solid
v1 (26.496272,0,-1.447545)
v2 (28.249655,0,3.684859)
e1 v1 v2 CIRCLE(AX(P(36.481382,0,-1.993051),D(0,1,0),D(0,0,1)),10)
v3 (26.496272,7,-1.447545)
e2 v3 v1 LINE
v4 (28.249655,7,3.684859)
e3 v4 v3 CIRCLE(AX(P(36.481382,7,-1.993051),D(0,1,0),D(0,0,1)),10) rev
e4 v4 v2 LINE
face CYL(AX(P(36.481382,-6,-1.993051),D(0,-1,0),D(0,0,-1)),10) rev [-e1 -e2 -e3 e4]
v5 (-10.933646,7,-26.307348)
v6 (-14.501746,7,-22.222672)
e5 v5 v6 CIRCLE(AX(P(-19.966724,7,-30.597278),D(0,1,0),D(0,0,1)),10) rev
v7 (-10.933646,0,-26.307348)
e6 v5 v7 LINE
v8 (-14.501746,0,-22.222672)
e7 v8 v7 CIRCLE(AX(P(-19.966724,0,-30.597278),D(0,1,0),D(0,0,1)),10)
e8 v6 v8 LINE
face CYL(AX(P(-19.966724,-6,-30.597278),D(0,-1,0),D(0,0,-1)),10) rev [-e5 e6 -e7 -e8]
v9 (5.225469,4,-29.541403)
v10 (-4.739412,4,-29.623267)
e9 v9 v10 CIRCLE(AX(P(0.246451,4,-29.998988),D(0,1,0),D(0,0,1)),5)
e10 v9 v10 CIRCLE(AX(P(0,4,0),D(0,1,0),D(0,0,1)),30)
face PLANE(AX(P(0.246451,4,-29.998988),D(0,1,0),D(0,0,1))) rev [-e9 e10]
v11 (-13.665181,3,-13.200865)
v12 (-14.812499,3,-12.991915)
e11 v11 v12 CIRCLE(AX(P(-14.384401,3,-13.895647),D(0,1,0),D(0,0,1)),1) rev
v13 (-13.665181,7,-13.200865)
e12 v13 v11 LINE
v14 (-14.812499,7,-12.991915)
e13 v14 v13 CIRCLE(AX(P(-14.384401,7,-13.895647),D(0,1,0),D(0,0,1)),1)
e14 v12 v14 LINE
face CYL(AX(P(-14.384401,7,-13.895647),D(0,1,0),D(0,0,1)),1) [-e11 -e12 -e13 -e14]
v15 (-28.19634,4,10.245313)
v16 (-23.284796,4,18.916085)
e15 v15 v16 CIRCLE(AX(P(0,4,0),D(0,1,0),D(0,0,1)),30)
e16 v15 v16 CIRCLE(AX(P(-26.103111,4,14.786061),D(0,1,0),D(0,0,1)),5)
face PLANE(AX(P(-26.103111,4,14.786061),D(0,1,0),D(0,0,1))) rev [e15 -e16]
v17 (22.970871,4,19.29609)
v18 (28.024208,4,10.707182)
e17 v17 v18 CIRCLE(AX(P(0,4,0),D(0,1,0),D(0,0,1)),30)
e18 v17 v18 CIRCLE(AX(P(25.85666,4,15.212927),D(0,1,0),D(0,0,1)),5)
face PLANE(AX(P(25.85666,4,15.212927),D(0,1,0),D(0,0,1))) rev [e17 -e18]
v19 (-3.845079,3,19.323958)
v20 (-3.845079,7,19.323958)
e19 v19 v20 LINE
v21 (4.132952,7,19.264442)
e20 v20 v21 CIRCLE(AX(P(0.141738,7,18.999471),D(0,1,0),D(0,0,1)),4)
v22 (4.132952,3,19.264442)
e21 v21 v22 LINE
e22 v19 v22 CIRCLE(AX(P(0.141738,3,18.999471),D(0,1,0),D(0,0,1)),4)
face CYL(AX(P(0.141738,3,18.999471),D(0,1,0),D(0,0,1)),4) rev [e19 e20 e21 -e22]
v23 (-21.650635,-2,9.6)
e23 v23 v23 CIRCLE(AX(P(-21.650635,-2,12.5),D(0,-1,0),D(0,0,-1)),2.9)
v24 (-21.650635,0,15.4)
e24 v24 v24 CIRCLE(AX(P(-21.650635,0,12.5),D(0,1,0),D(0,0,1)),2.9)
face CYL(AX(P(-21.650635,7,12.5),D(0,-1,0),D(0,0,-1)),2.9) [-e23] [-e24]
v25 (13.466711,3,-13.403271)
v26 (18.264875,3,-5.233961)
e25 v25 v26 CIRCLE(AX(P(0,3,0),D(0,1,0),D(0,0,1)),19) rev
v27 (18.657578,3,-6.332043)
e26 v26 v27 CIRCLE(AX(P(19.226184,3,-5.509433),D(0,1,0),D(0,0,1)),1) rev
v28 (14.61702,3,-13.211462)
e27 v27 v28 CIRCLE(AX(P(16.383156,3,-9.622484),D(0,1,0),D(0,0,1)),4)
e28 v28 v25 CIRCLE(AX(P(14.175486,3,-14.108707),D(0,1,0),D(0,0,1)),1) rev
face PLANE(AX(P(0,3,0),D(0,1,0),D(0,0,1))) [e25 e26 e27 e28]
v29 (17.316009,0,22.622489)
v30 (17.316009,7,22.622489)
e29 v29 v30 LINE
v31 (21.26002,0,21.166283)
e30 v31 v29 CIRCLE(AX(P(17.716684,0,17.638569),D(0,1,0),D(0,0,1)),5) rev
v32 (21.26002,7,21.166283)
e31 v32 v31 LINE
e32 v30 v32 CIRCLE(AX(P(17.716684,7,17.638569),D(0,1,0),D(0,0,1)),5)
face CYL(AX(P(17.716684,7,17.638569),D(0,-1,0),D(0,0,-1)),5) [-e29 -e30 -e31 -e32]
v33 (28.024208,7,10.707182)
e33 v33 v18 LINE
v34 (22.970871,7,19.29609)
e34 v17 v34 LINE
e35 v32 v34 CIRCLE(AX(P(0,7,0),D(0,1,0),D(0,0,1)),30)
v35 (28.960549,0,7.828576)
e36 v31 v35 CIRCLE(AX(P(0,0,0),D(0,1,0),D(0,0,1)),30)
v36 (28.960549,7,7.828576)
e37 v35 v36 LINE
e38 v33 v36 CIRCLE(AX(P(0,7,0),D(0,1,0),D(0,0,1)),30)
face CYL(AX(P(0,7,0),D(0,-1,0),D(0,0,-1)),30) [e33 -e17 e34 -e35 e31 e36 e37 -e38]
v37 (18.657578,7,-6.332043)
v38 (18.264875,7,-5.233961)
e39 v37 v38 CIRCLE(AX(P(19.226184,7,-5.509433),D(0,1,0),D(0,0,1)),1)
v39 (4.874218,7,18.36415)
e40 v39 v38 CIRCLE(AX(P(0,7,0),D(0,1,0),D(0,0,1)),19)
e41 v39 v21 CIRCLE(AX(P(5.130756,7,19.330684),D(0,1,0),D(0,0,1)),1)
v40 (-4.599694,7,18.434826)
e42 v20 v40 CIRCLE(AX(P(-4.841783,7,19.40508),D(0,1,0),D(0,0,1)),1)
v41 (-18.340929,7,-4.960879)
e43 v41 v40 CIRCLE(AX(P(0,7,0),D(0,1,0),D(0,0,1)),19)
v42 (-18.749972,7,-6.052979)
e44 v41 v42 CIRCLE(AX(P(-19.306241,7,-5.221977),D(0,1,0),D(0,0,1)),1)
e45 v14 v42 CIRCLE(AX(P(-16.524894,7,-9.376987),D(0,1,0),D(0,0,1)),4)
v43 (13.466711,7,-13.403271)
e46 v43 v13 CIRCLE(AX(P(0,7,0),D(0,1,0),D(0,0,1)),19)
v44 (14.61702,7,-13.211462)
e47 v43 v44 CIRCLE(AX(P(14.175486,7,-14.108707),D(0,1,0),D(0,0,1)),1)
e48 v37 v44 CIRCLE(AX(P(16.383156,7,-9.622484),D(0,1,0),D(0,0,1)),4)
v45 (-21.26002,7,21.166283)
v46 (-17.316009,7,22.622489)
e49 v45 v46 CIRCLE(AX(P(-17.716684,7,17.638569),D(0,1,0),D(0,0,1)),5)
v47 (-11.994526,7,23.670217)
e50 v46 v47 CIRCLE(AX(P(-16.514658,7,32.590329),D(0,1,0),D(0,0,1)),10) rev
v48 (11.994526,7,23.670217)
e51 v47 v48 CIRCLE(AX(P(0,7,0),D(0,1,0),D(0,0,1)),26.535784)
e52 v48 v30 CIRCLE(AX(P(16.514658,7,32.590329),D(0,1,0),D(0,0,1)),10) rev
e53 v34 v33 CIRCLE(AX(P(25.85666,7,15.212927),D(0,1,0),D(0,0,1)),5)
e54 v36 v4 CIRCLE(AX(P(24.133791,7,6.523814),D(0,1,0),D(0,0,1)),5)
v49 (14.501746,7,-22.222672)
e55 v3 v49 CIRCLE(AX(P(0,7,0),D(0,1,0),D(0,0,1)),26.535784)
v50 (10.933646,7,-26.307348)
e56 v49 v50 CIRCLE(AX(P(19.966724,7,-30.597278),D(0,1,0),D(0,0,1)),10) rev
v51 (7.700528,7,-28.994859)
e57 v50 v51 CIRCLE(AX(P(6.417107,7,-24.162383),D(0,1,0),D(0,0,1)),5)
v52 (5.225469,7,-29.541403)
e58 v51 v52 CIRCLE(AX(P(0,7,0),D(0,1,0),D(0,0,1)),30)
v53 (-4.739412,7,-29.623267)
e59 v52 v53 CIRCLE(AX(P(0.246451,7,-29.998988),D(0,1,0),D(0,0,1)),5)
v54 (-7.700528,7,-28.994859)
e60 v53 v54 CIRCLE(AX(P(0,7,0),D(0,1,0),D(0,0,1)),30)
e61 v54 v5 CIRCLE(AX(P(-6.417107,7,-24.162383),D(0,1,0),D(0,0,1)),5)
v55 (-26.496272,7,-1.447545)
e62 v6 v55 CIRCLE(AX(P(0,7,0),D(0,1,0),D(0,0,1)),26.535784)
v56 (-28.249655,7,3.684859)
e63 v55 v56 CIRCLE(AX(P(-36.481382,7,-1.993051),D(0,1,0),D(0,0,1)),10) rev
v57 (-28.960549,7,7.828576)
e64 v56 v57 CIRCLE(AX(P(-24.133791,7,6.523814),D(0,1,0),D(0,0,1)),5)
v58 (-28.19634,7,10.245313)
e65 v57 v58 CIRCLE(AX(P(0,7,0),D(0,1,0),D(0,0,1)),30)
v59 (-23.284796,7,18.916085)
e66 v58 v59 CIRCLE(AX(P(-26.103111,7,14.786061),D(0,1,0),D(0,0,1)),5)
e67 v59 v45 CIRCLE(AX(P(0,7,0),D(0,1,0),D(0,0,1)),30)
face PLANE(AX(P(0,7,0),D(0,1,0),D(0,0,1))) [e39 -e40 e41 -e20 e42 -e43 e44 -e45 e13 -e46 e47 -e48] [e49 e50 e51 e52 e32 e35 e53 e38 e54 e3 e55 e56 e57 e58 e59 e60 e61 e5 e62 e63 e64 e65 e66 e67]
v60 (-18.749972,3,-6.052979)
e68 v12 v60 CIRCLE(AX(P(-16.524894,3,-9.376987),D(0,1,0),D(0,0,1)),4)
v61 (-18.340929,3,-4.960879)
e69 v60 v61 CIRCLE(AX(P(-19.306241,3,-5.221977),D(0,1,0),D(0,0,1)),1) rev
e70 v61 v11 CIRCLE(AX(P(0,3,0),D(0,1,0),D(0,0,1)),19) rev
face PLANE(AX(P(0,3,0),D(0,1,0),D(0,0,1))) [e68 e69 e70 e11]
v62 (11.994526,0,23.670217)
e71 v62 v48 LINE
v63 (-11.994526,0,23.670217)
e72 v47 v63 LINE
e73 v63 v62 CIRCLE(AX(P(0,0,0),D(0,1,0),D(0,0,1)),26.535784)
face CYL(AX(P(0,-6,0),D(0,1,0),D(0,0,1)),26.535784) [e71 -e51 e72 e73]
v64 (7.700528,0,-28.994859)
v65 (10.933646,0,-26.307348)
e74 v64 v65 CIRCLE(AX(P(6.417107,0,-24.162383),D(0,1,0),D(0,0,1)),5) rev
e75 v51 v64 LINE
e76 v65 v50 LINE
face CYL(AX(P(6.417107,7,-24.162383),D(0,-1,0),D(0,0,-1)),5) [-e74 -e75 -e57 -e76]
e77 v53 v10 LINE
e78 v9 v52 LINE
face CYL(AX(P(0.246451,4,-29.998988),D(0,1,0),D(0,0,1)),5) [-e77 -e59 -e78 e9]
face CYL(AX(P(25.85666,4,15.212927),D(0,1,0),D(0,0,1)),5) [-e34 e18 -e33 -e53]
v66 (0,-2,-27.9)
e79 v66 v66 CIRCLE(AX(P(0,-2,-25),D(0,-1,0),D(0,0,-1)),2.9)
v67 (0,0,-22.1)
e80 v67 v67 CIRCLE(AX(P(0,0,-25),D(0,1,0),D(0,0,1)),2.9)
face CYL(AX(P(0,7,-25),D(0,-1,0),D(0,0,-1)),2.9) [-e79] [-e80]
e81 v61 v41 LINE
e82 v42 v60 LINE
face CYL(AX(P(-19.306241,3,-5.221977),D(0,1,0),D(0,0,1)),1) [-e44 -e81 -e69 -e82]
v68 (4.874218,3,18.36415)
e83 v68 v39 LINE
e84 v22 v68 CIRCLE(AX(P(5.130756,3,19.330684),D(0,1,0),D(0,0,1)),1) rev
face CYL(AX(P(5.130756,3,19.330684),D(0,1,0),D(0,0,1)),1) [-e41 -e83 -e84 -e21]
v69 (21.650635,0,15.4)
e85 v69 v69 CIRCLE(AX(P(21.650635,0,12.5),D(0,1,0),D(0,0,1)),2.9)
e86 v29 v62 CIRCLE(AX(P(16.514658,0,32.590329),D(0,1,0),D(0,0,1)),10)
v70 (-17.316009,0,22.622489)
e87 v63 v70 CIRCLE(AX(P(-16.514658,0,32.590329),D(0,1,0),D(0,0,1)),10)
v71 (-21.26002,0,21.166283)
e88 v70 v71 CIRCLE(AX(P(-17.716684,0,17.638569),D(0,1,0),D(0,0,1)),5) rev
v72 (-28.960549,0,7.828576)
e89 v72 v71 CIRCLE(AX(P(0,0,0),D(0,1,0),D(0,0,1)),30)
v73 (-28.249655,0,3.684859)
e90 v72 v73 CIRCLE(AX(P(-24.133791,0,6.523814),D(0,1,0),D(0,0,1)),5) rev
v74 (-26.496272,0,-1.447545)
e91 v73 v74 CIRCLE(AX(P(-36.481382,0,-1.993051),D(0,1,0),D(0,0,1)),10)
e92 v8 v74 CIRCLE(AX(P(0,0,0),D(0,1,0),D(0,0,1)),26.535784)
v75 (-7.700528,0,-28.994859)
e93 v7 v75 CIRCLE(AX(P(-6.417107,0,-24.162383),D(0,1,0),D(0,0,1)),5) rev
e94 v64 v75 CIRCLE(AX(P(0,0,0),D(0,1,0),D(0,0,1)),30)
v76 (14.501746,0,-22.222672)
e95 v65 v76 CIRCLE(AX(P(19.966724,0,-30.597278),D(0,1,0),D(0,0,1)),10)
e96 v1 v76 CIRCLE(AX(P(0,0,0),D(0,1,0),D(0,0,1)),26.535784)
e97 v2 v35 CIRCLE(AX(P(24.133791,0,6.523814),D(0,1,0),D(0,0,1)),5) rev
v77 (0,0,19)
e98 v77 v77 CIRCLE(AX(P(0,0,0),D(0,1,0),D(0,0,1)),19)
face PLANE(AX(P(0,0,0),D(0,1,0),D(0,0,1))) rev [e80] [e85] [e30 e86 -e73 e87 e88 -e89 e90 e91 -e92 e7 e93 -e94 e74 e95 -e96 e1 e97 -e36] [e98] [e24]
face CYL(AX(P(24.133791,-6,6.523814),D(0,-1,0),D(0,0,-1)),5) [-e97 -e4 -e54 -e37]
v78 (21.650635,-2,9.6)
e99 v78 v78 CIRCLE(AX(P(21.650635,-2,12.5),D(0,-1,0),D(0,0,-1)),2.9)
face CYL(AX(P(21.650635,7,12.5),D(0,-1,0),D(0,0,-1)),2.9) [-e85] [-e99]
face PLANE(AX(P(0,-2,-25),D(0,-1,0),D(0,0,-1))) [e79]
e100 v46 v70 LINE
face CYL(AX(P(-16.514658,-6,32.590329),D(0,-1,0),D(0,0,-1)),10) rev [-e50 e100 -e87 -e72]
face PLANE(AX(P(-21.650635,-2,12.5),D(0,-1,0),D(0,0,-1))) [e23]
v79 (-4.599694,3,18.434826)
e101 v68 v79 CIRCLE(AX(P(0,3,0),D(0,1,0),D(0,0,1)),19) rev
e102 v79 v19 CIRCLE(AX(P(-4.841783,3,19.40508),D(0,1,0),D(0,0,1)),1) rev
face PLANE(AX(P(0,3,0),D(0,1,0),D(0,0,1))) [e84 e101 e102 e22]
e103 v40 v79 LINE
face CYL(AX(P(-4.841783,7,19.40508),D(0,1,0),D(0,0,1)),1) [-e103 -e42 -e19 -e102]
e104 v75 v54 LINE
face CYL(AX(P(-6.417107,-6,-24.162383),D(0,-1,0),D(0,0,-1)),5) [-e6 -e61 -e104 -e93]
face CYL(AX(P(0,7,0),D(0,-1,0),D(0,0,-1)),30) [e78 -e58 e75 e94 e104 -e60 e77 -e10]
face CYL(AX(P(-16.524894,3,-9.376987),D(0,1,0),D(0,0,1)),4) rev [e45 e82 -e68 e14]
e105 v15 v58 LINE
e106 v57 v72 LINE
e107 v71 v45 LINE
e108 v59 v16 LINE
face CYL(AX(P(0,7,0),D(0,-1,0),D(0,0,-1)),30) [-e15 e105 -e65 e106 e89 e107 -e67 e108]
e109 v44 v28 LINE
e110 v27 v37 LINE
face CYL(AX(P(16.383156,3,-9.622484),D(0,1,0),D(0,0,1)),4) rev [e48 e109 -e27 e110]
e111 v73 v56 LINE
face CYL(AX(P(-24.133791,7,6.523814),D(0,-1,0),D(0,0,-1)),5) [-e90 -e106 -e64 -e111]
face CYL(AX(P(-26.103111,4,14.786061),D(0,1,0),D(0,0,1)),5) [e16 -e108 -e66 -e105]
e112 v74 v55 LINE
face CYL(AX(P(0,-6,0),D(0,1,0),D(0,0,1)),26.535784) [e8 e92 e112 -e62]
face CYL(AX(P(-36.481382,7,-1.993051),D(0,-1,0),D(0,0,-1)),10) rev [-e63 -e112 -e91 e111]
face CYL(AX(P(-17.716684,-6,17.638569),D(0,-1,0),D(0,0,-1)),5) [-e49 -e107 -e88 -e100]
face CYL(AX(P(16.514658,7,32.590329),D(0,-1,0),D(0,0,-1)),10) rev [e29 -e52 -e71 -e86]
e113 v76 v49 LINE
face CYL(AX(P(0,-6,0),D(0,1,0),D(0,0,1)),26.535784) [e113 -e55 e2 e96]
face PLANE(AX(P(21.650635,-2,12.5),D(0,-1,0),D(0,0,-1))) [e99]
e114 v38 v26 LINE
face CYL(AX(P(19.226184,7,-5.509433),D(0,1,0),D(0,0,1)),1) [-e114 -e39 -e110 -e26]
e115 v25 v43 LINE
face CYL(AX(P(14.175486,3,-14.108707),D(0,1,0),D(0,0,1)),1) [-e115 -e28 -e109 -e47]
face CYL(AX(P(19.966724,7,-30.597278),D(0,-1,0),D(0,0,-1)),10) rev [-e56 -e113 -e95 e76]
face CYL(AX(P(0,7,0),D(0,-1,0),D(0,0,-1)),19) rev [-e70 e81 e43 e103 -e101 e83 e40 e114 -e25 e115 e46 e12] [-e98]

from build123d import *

# Parameters (mm, degrees)
SKETCH1_R                = 19
BOSS_EXTRUDE1_DEPTH      = 3.5
SKETCH2_R                = 30
SKETCH2_R_2              = 19
SKETCH2_R_3              = 2.8
BOSS_EXTRUDE2_DEPTH      = 7
BOSS_EXTRUDE3_DEPTH      = 2
BOSS_EXTRUDE3_DEPTH_BACK = 7
SKETCH4_R                = 2.9
SKETCH5_R                = 5
BOSS_EXTRUDE4_DEPTH      = 3
CUT_EXTRUDE1_START       = -10
SKETCH3_R                = 19
CUT_EXTRUDE1_DEPTH       = 10
CUT_EXTRUDE3_START       = -13
CUT_EXTRUDE3_DEPTH       = 13
FILLET1_R                = 10
FILLET2_R                = 5
CUT_EXTRUDE4_START       = -4
SKETCH8_R                = 4
SKETCH8_R_2              = 19
CUT_EXTRUDE4_DEPTH       = 4
FILLET3_R                = 1


with BuildPart() as part:
    # Sketch1 → Boss-Extrude1 (new body)
    with BuildSketch(Plane(origin=(0, 0, 0), x_dir=(1, 0, 0), z_dir=(0, 1, 0))):
        with Locations(Location((0, 0, 0), (0, 0, 270))):
            Circle(SKETCH1_R)
    extrude(amount=BOSS_EXTRUDE1_DEPTH)

    # Sketch2 → Boss-Extrude2 (add)
    with BuildSketch(Plane(origin=(0, 0, 0), x_dir=(1, 0, 0), z_dir=(0, 1, 0))):
        with Locations(Location((0, 0, 0), (0, 0, 270))):
            Circle(SKETCH2_R)
        with Locations(Location((0, 0, 0), (0, 0, 270))):
            Circle(SKETCH2_R_2, mode=Mode.SUBTRACT)
        with Locations(Location((0, 25, 0), (0, 0, 270))):
            Circle(SKETCH2_R_3, mode=Mode.SUBTRACT)
        with Locations(Location((21.650635095, -12.5, 0), (0, 0, 270))):
            Circle(SKETCH2_R_3, mode=Mode.SUBTRACT)
        with Locations(Location((-21.650635095, -12.5, 0), (0, 0, 270))):
            Circle(SKETCH2_R_3, mode=Mode.SUBTRACT)
    extrude(amount=BOSS_EXTRUDE2_DEPTH)

    # Sketch4 → Boss-Extrude3 (add, two sides: drawn at the far end of the back side and taken through both)
    with BuildSketch(Plane.XZ.offset(-BOSS_EXTRUDE3_DEPTH_BACK)):
        with Locations(Location((-21.650635095, 12.5, 0), (0, 0, 270))):
            Circle(SKETCH4_R)
        with Locations(Location((21.650635095, 12.5, 0), (0, 0, 270))):
            Circle(SKETCH4_R)
        with Locations(Location((0, -25, 0), (0, 0, 270))):
            Circle(SKETCH4_R)
    extrude(amount=BOSS_EXTRUDE3_DEPTH + BOSS_EXTRUDE3_DEPTH_BACK)

    # Sketch5 → Boss-Extrude4 (add)
    with BuildSketch(Plane(origin=(0, 7, 0), x_dir=(1, 0, 0), z_dir=(0, 1, 0))):
        with Locations((-26.103110985, -14.7860609)):
            Circle(SKETCH5_R)
        with Locations((0.246451131, 29.99898768)):
            Circle(SKETCH5_R)
        with Locations((25.856659853, -15.212926781)):
            Circle(SKETCH5_R)
    extrude(amount=-BOSS_EXTRUDE4_DEPTH)

    # Sketch3 → Cut-Extrude1 (cut)
    with BuildSketch(Plane(origin=(0, 3.5, 0), x_dir=(1, 0, 0), z_dir=(0, 1, 0)).offset(CUT_EXTRUDE1_START)):
        with Locations(Location((0, 0, 0), (0, 0, 270))):
            Circle(SKETCH3_R)
    extrude(amount=CUT_EXTRUDE1_DEPTH, mode=Mode.SUBTRACT)

    # Sketch7 → Cut-Extrude3 (cut)
    with BuildSketch(Plane(origin=(0, 7, 0), x_dir=(1, 0, 0), z_dir=(0, 1, 0)).offset(CUT_EXTRUDE3_START)):
        with BuildLine():
            ThreePointArc((-29.54423259, -5.20944533), (-25.980762114, 15), (-10.2606043, 28.190778624))
            Line((-10.2606043, 28.190778624), (-13.773984089, 37.84371026))
            Line((-13.773984089, 37.84371026), (-43.939319858, -7.747687605))
            Line((-43.939319858, -7.747687605), (-29.54423259, -5.20944533))
        make_face()
        with BuildLine():
            ThreePointArc((-26.13264562, -4.6078905), (-22.980662881, 13.267891901), (-9.075772579, 24.935480225))
            Line((-9.075772579, 24.935480225), (-10.2606043, 28.190778624))
            ThreePointArc((-10.2606043, 28.190778624), (-25.980762114, 15), (-29.54423259, -5.20944533))
            Line((-29.54423259, -5.20944533), (-26.13264562, -4.6078905))
        make_face()
        with BuildLine():
            Line((15.259965643, 41.926411025), (10.2606043, 28.190778624))
            ThreePointArc((10.2606043, 28.190778624), (25.980762114, 15), (29.54423259, -5.20944533))
            Line((29.54423259, -5.20944533), (39.660606503, -6.993234998))
            Line((39.660606503, -6.993234998), (15.259965643, 41.926411025))
        make_face()
        with BuildLine():
            Line((10.2606043, 28.190778624), (9.075772579, 24.935480225))
            ThreePointArc((9.075772579, 24.935480225), (21.736841548, 15.220300308), (26.535783801, 0))
            ThreePointArc((26.535783801, 0), (26.434807132, -2.312745947), (26.13264562, -4.6078905))
            Line((26.13264562, -4.6078905), (29.54423259, -5.20944533))
            ThreePointArc((29.54423259, -5.20944533), (25.980762114, 15), (10.2606043, 28.190778624))
        make_face()
        with BuildLine():
            Line((28.679354216, -34.17872342), (19.283628291, -22.981333294))
            ThreePointArc((19.283628291, -22.981333294), (0, -30), (-19.283628291, -22.981333294))
            Line((-19.283628291, -22.981333294), (-25.886622414, -30.850475262))
            Line((-25.886622414, -30.850475262), (28.679354216, -34.17872342))
        make_face()
        with BuildLine():
            Line((19.283628291, -22.981333294), (17.056873041, -20.327589725))
            ThreePointArc((17.056873041, -20.327589725), (0, -26.535783801), (-17.056873041, -20.327589725))
            Line((-17.056873041, -20.327589725), (-19.283628291, -22.981333294))
            ThreePointArc((-19.283628291, -22.981333294), (0, -30), (19.283628291, -22.981333294))
        make_face()
    extrude(amount=CUT_EXTRUDE3_DEPTH, mode=Mode.SUBTRACT)

    # Fillet1
    # the kernel refuses this fillet: 10 mm, written as the material it adds along each edge
    with BuildSketch(Plane(origin=(-26.13264562, 0, 4.6078905), x_dir=(-0.9848077530122318, 0, 0.17364817766679624), z_dir=(0, 1, 0)), Plane(origin=(17.056873041, 0, 20.327589725), x_dir=(0.6427876096865569, 0, 0.7660444431189634), z_dir=(0, 1, 0)), Plane(origin=(9.075772579, 0, -24.935480225), x_dir=(0.34202014332561265, 0, -0.9396926207859289), z_dir=(0, 1, 0))) as fillet1_piece_1:
        with BuildLine():
            CenterArc((9.045274498, -8.297697769), FILLET1_R, 123.92490422, 42.948020906)
            Line((-0.693413056, -6.026582466), (-0.888186807, -5.98116016))
            ThreePointArc((-0.888186807, -5.98116016), (-0.372612378, -3.01031053), (-0.2, 0))
            Line((-0.2, 0), (0, 0.2))
            ThreePointArc((0, 0.2), (1.732108099, 0.2), (3.352595033, 0.165953955))
            Line((3.352595033, 0.165953955), (3.464216199, 0))
        make_face()
    extrude(amount=7)
    with BuildSketch(Plane(origin=(-17.056873041, 0, 20.327589725), x_dir=(0.8344973728156843, 0, 0.551011918894429), z_dir=(0, 1, 0)), Plane(origin=(26.13264562, 0, 4.6078905), x_dir=(0.059941633142754296, 0, -0.99820188369697), z_dir=(0, 1, 0)), Plane(origin=(-9.075772579, 0, -24.935480225), x_dir=(-0.8944390059584274, 0, 0.44718996480254386), z_dir=(0, 1, 0))) as fillet1_piece_2:
        with BuildLine():
            CenterArc((7.20939257, -9.934457095), FILLET1_R, 96.563537437, 42.948020906)
            Line((-0.39597707, -3.441510719), (-0.548084463, -3.311651792))
            ThreePointArc((-0.548084463, -3.311651792), (-0.396677677, -1.697894369), (-0.198689142, 0.022860991))
            Line((-0.198689142, 0.022860991), (0.022860991, 0.198689142))
            ThreePointArc((0.022860991, 0.198689142), (3.03317152, 0.026076764), (6.04348205, 0.198689142))
            Line((6.04348205, 0.198689142), (6.06634304, 0))
        make_face()
    extrude(amount=7)

    # Fillet2
    fillet2_edges = [part.edges().sort_by_distance(p)[0] for p in [
        (-10.2606043, 3.5, -28.190778624),
        (-29.54423259, 3.5, 5.20944533),
        (-19.283628291, 3.5, 22.981333294),
        (19.283628291, 3.5, 22.981333294),
        (29.54423259, 3.5, 5.20944533),
        (10.2606043, 3.5, -28.190778624),
    ]]
    fillet(fillet2_edges, radius=FILLET2_R)

    # Sketch8 → Cut-Extrude4 (cut)
    with BuildSketch(Plane(origin=(0, 7, 0), x_dir=(1, 0, 0), z_dir=(0, 1, 0)).offset(CUT_EXTRUDE4_START)):
        with Locations((-16.524893724, 9.376987118)):
            Circle(SKETCH8_R)
        with Locations(Location((0, 0, 0), (0, 0, 42.512080704))):
            Circle(SKETCH8_R_2)
        with Locations((16.383155917, 9.622484201)):
            Circle(SKETCH8_R)
        with Locations((0.141737807, -18.999471319)):
            Circle(SKETCH8_R)
    extrude(amount=CUT_EXTRUDE4_DEPTH, mode=Mode.SUBTRACT)

    # Fillet3
    # the kernel refuses this fillet: 1 mm, written as the material it takes off along each edge
    with BuildSketch(Plane(origin=(-14.195555863, 8.950278825, -12.628784333), x_dir=(-0.8617980531882996, 0, -0.5072515308216002), z_dir=(0, -1, 0)), Plane(origin=(18.034625983, 8.950278825, -5.979319831), x_dir=(0.8701917383942803, 0, -0.49271324158209956), z_dir=(0, -1, 0))) as fillet3_piece_1:
        with BuildLine():
            CenterArc((0.805364366, 0.995988176), FILLET3_R, 193.528948716, 71.337075115)
            ThreePointArc((-0.166887482, 0.762051552), (-0.079532242, 0.381882385), (0, 0))
            ThreePointArc((0, 0), (0.357939718, 0.016047295), (0.715879437, 0))
        make_face()
    extrude(amount=5.950278825, mode=Mode.SUBTRACT)
    with BuildSketch(Plane(origin=(-18.121826323, 8.950278825, -5.709589366), x_dir=(-0.28086097725665193, 0, 0.9597484625955065), z_dir=(0, -1, 0)), Plane(origin=(14.005562597, 8.950278825, -12.839167276), x_dir=(-0.6907360612225409, 0, -0.7231069725336425), z_dir=(0, -1, 0))) as fillet3_piece_2:
        with BuildLine():
            CenterArc((0.800640781, 0.999789253), FILLET3_R, 197.486602821, 71.337075115)
            ThreePointArc((-0.153146456, 0.699306464), (-0.060897436, 0.353086193), (0, 0))
            ThreePointArc((0, 0), (0.390055765, 0.004004198), (0.78011153, 0))
        make_face()
    extrude(amount=5.950278825, mode=Mode.SUBTRACT)
    with BuildSketch(Plane(origin=(-3.83907012, 8.950278825, 18.608104165), x_dir=(-0.9750194381231715, 0, -0.22211955177780904), z_dir=(0, -1, 0))) as fillet3_piece_3:
        with BuildLine():
            CenterArc((0.800640781, -0.999789253), FILLET3_R, 91.176322064, 71.337075115)
            ThreePointArc((-0.153146456, -0.699306464), (-0.060897436, -0.353086193), (0, 0))
            ThreePointArc((0, 0), (0.390055765, -0.004004198), (0.78011153, 0))
        make_face()
    extrude(amount=5.950278825, mode=Mode.SUBTRACT)
    with BuildSketch(Plane(origin=(4.116263726, 8.950278825, 18.548756641), x_dir=(0.023311579398747933, 0, 0.9997282482084497), z_dir=(0, -1, 0))) as fillet3_piece_4:
        with BuildLine():
            CenterArc((0.805364366, -0.995988176), FILLET3_R, 95.133976169, 71.337075115)
            ThreePointArc((-0.166887482, -0.762051552), (-0.079532242, -0.381882385), (0, 0))
            ThreePointArc((0, 0), (0.357939718, -0.016047295), (0.715879437, 0))
        make_face()
    extrude(amount=5.950278825, mode=Mode.SUBTRACT)


solid = part.part
